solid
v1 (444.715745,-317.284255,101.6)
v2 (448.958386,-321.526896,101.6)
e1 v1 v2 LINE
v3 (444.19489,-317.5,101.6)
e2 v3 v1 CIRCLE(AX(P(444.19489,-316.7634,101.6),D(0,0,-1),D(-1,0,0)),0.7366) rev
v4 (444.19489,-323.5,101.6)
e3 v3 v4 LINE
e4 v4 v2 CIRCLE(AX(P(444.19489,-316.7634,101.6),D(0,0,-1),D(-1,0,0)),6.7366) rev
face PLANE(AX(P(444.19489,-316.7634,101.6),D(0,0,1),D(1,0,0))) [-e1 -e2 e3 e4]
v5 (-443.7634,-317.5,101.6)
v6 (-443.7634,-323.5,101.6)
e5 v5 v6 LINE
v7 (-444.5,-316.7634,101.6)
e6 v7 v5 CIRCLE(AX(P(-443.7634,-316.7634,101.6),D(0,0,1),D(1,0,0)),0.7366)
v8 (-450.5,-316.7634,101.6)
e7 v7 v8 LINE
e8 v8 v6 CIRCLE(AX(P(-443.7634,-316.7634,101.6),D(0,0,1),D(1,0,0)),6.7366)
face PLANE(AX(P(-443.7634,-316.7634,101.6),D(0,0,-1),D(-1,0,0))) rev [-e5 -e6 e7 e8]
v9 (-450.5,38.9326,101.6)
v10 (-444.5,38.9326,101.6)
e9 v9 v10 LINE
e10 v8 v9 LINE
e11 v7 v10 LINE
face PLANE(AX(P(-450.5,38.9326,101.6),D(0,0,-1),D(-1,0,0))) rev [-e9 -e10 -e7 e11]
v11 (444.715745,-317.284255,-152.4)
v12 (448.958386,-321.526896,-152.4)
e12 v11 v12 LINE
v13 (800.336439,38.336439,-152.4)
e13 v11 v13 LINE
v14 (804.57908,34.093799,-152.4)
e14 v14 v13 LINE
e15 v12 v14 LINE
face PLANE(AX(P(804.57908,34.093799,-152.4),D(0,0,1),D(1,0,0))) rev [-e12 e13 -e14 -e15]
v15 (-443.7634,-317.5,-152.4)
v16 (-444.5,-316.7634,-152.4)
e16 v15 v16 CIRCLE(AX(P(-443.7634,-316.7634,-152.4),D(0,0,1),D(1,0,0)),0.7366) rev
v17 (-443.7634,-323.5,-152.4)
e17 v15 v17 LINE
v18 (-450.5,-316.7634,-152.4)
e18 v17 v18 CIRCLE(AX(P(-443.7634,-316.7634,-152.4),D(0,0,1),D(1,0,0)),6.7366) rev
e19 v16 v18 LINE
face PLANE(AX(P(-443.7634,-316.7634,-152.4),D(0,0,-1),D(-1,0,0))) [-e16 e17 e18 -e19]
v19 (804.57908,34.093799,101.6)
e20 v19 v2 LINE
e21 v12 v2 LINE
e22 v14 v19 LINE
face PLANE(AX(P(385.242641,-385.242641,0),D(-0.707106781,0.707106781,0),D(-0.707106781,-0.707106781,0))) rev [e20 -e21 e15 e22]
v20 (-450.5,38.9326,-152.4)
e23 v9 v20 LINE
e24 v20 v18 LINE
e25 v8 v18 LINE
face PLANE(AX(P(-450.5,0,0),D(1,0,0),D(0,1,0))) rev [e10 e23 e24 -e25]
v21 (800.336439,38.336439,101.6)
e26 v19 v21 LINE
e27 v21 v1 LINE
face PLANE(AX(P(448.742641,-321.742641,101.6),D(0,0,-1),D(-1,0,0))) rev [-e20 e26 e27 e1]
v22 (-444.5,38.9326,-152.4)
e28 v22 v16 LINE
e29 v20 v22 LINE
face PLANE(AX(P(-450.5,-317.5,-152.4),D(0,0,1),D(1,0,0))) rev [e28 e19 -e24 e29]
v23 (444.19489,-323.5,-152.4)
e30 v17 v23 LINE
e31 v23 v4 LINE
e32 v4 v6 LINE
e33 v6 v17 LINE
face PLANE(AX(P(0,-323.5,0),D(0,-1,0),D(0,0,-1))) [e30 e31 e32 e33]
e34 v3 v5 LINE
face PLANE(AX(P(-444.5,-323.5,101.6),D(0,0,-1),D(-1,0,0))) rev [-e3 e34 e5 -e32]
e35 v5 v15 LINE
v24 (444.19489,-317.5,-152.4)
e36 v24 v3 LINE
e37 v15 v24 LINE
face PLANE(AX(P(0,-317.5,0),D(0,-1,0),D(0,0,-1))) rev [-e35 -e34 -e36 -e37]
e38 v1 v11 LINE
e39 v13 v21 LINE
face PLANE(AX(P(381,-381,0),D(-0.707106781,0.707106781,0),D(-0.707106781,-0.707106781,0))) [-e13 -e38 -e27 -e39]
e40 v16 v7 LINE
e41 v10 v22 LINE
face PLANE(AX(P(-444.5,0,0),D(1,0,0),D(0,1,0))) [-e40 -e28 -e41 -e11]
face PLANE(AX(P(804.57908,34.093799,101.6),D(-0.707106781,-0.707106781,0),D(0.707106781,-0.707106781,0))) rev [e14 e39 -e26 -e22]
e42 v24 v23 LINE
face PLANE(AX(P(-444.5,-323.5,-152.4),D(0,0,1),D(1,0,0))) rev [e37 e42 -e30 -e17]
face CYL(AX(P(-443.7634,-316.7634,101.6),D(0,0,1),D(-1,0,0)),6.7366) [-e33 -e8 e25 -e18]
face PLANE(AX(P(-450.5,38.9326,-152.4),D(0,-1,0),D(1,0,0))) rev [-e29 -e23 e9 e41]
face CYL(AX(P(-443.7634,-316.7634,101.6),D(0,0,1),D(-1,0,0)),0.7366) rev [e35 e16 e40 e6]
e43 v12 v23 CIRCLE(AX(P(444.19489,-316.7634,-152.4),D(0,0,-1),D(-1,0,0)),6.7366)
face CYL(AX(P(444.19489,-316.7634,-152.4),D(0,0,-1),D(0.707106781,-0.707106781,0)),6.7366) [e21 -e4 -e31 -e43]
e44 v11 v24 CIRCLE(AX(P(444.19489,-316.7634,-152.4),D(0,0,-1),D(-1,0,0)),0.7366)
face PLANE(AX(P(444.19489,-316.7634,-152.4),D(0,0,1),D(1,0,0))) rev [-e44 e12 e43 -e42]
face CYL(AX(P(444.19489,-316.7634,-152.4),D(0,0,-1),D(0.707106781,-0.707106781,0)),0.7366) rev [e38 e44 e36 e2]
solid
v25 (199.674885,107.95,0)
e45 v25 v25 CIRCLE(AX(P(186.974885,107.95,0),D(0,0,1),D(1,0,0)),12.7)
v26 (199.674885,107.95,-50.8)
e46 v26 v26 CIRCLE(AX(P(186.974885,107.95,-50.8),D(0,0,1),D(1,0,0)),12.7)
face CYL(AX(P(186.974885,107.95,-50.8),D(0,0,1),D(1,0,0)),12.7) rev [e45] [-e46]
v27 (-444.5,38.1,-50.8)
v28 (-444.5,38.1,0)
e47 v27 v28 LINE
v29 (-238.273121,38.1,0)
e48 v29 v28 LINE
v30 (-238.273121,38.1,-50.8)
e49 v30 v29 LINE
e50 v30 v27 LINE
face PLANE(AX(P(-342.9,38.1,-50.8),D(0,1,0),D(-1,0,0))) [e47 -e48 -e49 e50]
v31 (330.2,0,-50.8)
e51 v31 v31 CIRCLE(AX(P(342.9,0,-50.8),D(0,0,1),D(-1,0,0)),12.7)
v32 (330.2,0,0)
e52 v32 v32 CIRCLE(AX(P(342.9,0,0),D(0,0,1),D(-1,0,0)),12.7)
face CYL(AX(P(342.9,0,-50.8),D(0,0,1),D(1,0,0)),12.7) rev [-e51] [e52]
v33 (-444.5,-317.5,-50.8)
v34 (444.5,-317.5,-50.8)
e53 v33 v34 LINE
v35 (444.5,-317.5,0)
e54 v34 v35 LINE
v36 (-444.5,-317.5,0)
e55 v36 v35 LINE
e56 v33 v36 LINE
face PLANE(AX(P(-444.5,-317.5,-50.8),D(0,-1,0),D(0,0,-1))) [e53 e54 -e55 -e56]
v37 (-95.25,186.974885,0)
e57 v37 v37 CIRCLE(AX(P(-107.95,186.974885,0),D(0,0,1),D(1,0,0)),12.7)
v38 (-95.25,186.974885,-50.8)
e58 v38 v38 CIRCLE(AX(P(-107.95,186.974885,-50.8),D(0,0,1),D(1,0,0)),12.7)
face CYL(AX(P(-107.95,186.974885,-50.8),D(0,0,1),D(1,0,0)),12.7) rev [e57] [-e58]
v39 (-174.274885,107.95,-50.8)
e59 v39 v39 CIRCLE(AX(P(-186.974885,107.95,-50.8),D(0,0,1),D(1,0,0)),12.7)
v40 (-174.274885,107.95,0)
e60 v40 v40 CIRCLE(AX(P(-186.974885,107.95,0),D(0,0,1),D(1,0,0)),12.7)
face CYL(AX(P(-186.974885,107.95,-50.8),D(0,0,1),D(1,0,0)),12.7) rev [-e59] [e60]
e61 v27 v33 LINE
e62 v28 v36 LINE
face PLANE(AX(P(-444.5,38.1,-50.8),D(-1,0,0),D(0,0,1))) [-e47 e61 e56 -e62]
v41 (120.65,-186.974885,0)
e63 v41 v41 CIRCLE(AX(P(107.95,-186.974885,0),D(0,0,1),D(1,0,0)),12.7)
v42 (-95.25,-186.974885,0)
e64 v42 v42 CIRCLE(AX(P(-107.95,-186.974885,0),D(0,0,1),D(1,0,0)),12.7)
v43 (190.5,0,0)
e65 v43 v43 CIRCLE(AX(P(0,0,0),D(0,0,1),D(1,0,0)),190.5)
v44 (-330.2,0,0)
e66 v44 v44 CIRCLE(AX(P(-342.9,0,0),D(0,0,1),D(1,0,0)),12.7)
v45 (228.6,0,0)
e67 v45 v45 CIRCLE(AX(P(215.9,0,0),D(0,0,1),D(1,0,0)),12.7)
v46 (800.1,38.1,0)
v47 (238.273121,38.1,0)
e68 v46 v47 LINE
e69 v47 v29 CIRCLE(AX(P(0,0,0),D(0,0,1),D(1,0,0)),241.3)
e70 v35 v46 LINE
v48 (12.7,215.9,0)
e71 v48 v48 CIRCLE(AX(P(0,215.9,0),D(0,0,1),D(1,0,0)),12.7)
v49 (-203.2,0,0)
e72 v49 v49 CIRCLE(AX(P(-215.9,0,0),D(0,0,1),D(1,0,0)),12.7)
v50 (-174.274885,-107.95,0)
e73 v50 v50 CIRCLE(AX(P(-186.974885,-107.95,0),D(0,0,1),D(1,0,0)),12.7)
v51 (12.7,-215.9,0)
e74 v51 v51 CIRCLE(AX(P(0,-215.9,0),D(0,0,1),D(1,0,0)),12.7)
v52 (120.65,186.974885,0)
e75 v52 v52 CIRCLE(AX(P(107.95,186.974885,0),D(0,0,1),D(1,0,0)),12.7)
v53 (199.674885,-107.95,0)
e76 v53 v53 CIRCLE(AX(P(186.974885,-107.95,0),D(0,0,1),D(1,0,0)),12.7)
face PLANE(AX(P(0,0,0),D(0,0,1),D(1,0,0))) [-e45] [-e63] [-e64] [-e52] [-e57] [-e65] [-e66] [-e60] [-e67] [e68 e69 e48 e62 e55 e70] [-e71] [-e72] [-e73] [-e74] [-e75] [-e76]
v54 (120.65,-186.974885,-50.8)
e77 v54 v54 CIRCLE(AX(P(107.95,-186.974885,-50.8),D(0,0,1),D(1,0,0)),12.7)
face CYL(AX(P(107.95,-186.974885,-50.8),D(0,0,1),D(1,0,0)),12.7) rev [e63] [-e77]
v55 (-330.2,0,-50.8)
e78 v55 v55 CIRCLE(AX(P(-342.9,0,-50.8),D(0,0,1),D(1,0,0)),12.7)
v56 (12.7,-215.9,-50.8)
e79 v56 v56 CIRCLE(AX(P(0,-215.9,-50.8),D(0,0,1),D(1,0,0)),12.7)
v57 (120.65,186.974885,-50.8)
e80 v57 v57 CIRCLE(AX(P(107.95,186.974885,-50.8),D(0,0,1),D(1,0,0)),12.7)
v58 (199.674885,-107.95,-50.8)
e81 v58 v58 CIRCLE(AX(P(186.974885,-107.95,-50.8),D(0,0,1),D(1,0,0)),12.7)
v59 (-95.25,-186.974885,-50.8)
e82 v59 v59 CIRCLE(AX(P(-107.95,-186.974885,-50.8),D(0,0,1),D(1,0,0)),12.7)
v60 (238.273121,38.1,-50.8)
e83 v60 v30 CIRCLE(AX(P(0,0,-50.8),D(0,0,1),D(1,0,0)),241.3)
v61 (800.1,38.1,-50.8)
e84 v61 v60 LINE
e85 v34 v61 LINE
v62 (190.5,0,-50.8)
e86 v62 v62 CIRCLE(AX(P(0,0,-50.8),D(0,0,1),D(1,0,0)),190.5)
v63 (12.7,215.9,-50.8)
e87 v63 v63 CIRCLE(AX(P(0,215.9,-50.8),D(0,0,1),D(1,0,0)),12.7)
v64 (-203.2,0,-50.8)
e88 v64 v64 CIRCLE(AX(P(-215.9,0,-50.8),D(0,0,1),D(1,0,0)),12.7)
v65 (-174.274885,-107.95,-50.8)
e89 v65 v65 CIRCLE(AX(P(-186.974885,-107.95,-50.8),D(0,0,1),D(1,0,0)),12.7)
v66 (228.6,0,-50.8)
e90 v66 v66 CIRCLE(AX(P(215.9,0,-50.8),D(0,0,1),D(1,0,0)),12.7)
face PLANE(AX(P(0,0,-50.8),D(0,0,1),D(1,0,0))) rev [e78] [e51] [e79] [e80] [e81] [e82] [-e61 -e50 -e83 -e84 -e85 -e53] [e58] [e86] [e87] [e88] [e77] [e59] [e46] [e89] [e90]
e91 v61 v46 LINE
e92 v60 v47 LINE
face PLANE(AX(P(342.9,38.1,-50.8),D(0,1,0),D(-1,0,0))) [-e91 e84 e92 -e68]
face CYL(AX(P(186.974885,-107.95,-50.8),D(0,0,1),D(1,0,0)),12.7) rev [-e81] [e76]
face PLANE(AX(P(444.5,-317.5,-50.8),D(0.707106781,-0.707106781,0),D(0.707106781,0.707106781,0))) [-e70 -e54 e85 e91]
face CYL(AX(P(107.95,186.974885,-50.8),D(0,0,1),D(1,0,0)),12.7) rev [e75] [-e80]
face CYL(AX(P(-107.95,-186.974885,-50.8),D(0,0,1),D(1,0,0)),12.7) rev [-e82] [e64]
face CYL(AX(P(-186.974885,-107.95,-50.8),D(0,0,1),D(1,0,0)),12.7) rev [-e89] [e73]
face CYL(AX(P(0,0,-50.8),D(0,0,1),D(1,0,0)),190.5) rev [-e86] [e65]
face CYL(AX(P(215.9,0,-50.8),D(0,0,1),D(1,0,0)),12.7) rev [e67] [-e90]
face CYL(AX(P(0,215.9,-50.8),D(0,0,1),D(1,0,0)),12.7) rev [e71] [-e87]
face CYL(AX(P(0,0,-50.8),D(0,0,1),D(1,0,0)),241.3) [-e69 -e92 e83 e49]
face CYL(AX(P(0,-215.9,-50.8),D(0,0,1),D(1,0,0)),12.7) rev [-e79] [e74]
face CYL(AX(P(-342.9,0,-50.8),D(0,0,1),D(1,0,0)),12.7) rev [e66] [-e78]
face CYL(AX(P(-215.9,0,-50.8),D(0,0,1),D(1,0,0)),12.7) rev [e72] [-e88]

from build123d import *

# Parameters (mm, degrees)
SKETCH1_R                    = 190.5
SKETCH1_R_2                  = 12.7
BASE_FLANGE1_DEPTH           = 50.8
SKETCH26_W                   = 889
SKETCH26_H                   = 254
BASE_FLANGE2_DEPTH           = 6
EDGE_FLANGE1_STRIP_CUT_DEPTH = 254
EDGE_FLANGE1_DEPTH           = 254
EDGE_FLANGE2_STRIP_W         = 25.4732
EDGE_FLANGE2_STRIP_H         = 6
EDGE_FLANGE2_STRIP_CUT_DEPTH = 254
EDGE_FLANGE2_DEPTH           = 254


# Sheet-metal steps are written as plain solids
with BuildPart() as part:
    # Sketch1 → Base-Flange1 (new body)
    with BuildSketch(Plane.XY):
        with BuildLine():
            Line((-342.9, 38.1), (-238.273120599, 38.1))
            ThreePointArc((-238.273120599, 38.1), (0, 241.3), (238.273120599, 38.1))
            Line((238.273120599, 38.1), (342.9, 38.1))
            Line((342.9, 38.1), (800.1, 38.1))
            Line((800.1, 38.1), (444.5, -317.5))
            Line((444.5, -317.5), (-444.5, -317.5))
            Line((-444.5, -317.5), (-444.5, 38.1))
            Line((-444.5, 38.1), (-342.9, 38.1))
        make_face()
        Circle(SKETCH1_R, mode=Mode.SUBTRACT)
        with Locations((0, 215.9)):
            Circle(SKETCH1_R_2, mode=Mode.SUBTRACT)
        with Locations((107.95, 186.974884677)):
            Circle(SKETCH1_R_2, mode=Mode.SUBTRACT)
        with Locations((186.974884677, 107.95)):
            Circle(SKETCH1_R_2, mode=Mode.SUBTRACT)
        with Locations((215.9, 0)):
            Circle(SKETCH1_R_2, mode=Mode.SUBTRACT)
        with Locations((186.974884677, -107.95)):
            Circle(SKETCH1_R_2, mode=Mode.SUBTRACT)
        with Locations((107.95, -186.974884677)):
            Circle(SKETCH1_R_2, mode=Mode.SUBTRACT)
        with Locations((0, -215.9)):
            Circle(SKETCH1_R_2, mode=Mode.SUBTRACT)
        with Locations((-107.95, -186.974884677)):
            Circle(SKETCH1_R_2, mode=Mode.SUBTRACT)
        with Locations((-186.974884677, -107.95)):
            Circle(SKETCH1_R_2, mode=Mode.SUBTRACT)
        with Locations((-215.9, 0)):
            Circle(SKETCH1_R_2, mode=Mode.SUBTRACT)
        with Locations((-186.974884677, 107.95)):
            Circle(SKETCH1_R_2, mode=Mode.SUBTRACT)
        with Locations((-107.95, 186.974884677)):
            Circle(SKETCH1_R_2, mode=Mode.SUBTRACT)
        with Locations((-342.9, 0)):
            Circle(SKETCH1_R_2, mode=Mode.SUBTRACT)
        with Locations(Location((342.9, 0, 0), (0, 0, 180))):
            Circle(SKETCH1_R_2, mode=Mode.SUBTRACT)
    extrude(amount=-BASE_FLANGE1_DEPTH)


with BuildPart() as body_2:
    # Sketch26 → Base-Flange2 (new body)
    with BuildSketch(Plane.XZ.offset(317.5)):
        with Locations((0, -25.4)):
            Rectangle(SKETCH26_W, SKETCH26_H)
    extrude(amount=BASE_FLANGE2_DEPTH)

    # Edge-Flange1 strip (across the edge) → Edge-Flange1 strip cut (cut)
    with BuildSketch(Plane(origin=(444.5, -317.5, 101.6), x_dir=(-0.7071067811865438, 0.7071067811865512, 0), z_dir=(0, 0, -1))):
        Polygon((-22.039168001, 13.553886626), (-4.026895542, -4.458385832), (0.215745145, -0.215745145), (-17.796527314, 17.796527314), align=None)
    extrude(amount=EDGE_FLANGE1_STRIP_CUT_DEPTH, mode=Mode.SUBTRACT)

    # Edge-Flange1 section (across the edge) → Edge-Flange1 (add)
    with BuildSketch(Plane(origin=(444.5, -317.5, 101.6), x_dir=(-0.7071067811865438, 0.7071067811865512, 0), z_dir=(0, 0, -1))):
        with BuildLine():
            Line((-6, 0.30510971), (-6, 503.228718626))
            Line((-6, 503.228718626), (0, 503.228718626))
            Line((0, 503.228718626), (0, 0.30510971))
            ThreePointArc((0, 0.30510971), (0.056070336, 0.023225094), (0.215745145, -0.215745145))
            Line((0.215745145, -0.215745145), (-4.026895542, -4.458385832))
            ThreePointArc((-4.026895542, -4.458385832), (-5.487206859, -2.2728755), (-6, 0.30510971))
        make_face()
    extrude(amount=EDGE_FLANGE1_DEPTH)

    # Edge-Flange2 strip (across the edge) → Edge-Flange2 strip cut (cut)
    with BuildSketch(Plane(origin=(-444.5, -317.5, -152.4), x_dir=(1, 0, 0), z_dir=(0, 0, 1))):
        with Locations((-12, -3)):
            Rectangle(EDGE_FLANGE2_STRIP_W, EDGE_FLANGE2_STRIP_H)
    extrude(amount=EDGE_FLANGE2_STRIP_CUT_DEPTH, mode=Mode.SUBTRACT)

    # Edge-Flange2 section (across the edge) → Edge-Flange2 (add)
    with BuildSketch(Plane(origin=(-444.5, -317.5, -152.4), x_dir=(1, 0, 0), z_dir=(0, 0, 1))):
        with BuildLine():
            Line((-6, 0.7366), (-6, 356.4326))
            Line((-6, 356.4326), (0, 356.4326))
            Line((0, 356.4326), (0, 0.7366))
            ThreePointArc((0, 0.7366), (0.215745145, 0.215745145), (0.7366, 0))
            Line((0.7366, 0), (0.7366, -6))
            ThreePointArc((0.7366, -6), (-4.026895542, -4.026895542), (-6, 0.7366))
        make_face()
    extrude(amount=EDGE_FLANGE2_DEPTH)


solid = Compound([part.part, body_2.part])
